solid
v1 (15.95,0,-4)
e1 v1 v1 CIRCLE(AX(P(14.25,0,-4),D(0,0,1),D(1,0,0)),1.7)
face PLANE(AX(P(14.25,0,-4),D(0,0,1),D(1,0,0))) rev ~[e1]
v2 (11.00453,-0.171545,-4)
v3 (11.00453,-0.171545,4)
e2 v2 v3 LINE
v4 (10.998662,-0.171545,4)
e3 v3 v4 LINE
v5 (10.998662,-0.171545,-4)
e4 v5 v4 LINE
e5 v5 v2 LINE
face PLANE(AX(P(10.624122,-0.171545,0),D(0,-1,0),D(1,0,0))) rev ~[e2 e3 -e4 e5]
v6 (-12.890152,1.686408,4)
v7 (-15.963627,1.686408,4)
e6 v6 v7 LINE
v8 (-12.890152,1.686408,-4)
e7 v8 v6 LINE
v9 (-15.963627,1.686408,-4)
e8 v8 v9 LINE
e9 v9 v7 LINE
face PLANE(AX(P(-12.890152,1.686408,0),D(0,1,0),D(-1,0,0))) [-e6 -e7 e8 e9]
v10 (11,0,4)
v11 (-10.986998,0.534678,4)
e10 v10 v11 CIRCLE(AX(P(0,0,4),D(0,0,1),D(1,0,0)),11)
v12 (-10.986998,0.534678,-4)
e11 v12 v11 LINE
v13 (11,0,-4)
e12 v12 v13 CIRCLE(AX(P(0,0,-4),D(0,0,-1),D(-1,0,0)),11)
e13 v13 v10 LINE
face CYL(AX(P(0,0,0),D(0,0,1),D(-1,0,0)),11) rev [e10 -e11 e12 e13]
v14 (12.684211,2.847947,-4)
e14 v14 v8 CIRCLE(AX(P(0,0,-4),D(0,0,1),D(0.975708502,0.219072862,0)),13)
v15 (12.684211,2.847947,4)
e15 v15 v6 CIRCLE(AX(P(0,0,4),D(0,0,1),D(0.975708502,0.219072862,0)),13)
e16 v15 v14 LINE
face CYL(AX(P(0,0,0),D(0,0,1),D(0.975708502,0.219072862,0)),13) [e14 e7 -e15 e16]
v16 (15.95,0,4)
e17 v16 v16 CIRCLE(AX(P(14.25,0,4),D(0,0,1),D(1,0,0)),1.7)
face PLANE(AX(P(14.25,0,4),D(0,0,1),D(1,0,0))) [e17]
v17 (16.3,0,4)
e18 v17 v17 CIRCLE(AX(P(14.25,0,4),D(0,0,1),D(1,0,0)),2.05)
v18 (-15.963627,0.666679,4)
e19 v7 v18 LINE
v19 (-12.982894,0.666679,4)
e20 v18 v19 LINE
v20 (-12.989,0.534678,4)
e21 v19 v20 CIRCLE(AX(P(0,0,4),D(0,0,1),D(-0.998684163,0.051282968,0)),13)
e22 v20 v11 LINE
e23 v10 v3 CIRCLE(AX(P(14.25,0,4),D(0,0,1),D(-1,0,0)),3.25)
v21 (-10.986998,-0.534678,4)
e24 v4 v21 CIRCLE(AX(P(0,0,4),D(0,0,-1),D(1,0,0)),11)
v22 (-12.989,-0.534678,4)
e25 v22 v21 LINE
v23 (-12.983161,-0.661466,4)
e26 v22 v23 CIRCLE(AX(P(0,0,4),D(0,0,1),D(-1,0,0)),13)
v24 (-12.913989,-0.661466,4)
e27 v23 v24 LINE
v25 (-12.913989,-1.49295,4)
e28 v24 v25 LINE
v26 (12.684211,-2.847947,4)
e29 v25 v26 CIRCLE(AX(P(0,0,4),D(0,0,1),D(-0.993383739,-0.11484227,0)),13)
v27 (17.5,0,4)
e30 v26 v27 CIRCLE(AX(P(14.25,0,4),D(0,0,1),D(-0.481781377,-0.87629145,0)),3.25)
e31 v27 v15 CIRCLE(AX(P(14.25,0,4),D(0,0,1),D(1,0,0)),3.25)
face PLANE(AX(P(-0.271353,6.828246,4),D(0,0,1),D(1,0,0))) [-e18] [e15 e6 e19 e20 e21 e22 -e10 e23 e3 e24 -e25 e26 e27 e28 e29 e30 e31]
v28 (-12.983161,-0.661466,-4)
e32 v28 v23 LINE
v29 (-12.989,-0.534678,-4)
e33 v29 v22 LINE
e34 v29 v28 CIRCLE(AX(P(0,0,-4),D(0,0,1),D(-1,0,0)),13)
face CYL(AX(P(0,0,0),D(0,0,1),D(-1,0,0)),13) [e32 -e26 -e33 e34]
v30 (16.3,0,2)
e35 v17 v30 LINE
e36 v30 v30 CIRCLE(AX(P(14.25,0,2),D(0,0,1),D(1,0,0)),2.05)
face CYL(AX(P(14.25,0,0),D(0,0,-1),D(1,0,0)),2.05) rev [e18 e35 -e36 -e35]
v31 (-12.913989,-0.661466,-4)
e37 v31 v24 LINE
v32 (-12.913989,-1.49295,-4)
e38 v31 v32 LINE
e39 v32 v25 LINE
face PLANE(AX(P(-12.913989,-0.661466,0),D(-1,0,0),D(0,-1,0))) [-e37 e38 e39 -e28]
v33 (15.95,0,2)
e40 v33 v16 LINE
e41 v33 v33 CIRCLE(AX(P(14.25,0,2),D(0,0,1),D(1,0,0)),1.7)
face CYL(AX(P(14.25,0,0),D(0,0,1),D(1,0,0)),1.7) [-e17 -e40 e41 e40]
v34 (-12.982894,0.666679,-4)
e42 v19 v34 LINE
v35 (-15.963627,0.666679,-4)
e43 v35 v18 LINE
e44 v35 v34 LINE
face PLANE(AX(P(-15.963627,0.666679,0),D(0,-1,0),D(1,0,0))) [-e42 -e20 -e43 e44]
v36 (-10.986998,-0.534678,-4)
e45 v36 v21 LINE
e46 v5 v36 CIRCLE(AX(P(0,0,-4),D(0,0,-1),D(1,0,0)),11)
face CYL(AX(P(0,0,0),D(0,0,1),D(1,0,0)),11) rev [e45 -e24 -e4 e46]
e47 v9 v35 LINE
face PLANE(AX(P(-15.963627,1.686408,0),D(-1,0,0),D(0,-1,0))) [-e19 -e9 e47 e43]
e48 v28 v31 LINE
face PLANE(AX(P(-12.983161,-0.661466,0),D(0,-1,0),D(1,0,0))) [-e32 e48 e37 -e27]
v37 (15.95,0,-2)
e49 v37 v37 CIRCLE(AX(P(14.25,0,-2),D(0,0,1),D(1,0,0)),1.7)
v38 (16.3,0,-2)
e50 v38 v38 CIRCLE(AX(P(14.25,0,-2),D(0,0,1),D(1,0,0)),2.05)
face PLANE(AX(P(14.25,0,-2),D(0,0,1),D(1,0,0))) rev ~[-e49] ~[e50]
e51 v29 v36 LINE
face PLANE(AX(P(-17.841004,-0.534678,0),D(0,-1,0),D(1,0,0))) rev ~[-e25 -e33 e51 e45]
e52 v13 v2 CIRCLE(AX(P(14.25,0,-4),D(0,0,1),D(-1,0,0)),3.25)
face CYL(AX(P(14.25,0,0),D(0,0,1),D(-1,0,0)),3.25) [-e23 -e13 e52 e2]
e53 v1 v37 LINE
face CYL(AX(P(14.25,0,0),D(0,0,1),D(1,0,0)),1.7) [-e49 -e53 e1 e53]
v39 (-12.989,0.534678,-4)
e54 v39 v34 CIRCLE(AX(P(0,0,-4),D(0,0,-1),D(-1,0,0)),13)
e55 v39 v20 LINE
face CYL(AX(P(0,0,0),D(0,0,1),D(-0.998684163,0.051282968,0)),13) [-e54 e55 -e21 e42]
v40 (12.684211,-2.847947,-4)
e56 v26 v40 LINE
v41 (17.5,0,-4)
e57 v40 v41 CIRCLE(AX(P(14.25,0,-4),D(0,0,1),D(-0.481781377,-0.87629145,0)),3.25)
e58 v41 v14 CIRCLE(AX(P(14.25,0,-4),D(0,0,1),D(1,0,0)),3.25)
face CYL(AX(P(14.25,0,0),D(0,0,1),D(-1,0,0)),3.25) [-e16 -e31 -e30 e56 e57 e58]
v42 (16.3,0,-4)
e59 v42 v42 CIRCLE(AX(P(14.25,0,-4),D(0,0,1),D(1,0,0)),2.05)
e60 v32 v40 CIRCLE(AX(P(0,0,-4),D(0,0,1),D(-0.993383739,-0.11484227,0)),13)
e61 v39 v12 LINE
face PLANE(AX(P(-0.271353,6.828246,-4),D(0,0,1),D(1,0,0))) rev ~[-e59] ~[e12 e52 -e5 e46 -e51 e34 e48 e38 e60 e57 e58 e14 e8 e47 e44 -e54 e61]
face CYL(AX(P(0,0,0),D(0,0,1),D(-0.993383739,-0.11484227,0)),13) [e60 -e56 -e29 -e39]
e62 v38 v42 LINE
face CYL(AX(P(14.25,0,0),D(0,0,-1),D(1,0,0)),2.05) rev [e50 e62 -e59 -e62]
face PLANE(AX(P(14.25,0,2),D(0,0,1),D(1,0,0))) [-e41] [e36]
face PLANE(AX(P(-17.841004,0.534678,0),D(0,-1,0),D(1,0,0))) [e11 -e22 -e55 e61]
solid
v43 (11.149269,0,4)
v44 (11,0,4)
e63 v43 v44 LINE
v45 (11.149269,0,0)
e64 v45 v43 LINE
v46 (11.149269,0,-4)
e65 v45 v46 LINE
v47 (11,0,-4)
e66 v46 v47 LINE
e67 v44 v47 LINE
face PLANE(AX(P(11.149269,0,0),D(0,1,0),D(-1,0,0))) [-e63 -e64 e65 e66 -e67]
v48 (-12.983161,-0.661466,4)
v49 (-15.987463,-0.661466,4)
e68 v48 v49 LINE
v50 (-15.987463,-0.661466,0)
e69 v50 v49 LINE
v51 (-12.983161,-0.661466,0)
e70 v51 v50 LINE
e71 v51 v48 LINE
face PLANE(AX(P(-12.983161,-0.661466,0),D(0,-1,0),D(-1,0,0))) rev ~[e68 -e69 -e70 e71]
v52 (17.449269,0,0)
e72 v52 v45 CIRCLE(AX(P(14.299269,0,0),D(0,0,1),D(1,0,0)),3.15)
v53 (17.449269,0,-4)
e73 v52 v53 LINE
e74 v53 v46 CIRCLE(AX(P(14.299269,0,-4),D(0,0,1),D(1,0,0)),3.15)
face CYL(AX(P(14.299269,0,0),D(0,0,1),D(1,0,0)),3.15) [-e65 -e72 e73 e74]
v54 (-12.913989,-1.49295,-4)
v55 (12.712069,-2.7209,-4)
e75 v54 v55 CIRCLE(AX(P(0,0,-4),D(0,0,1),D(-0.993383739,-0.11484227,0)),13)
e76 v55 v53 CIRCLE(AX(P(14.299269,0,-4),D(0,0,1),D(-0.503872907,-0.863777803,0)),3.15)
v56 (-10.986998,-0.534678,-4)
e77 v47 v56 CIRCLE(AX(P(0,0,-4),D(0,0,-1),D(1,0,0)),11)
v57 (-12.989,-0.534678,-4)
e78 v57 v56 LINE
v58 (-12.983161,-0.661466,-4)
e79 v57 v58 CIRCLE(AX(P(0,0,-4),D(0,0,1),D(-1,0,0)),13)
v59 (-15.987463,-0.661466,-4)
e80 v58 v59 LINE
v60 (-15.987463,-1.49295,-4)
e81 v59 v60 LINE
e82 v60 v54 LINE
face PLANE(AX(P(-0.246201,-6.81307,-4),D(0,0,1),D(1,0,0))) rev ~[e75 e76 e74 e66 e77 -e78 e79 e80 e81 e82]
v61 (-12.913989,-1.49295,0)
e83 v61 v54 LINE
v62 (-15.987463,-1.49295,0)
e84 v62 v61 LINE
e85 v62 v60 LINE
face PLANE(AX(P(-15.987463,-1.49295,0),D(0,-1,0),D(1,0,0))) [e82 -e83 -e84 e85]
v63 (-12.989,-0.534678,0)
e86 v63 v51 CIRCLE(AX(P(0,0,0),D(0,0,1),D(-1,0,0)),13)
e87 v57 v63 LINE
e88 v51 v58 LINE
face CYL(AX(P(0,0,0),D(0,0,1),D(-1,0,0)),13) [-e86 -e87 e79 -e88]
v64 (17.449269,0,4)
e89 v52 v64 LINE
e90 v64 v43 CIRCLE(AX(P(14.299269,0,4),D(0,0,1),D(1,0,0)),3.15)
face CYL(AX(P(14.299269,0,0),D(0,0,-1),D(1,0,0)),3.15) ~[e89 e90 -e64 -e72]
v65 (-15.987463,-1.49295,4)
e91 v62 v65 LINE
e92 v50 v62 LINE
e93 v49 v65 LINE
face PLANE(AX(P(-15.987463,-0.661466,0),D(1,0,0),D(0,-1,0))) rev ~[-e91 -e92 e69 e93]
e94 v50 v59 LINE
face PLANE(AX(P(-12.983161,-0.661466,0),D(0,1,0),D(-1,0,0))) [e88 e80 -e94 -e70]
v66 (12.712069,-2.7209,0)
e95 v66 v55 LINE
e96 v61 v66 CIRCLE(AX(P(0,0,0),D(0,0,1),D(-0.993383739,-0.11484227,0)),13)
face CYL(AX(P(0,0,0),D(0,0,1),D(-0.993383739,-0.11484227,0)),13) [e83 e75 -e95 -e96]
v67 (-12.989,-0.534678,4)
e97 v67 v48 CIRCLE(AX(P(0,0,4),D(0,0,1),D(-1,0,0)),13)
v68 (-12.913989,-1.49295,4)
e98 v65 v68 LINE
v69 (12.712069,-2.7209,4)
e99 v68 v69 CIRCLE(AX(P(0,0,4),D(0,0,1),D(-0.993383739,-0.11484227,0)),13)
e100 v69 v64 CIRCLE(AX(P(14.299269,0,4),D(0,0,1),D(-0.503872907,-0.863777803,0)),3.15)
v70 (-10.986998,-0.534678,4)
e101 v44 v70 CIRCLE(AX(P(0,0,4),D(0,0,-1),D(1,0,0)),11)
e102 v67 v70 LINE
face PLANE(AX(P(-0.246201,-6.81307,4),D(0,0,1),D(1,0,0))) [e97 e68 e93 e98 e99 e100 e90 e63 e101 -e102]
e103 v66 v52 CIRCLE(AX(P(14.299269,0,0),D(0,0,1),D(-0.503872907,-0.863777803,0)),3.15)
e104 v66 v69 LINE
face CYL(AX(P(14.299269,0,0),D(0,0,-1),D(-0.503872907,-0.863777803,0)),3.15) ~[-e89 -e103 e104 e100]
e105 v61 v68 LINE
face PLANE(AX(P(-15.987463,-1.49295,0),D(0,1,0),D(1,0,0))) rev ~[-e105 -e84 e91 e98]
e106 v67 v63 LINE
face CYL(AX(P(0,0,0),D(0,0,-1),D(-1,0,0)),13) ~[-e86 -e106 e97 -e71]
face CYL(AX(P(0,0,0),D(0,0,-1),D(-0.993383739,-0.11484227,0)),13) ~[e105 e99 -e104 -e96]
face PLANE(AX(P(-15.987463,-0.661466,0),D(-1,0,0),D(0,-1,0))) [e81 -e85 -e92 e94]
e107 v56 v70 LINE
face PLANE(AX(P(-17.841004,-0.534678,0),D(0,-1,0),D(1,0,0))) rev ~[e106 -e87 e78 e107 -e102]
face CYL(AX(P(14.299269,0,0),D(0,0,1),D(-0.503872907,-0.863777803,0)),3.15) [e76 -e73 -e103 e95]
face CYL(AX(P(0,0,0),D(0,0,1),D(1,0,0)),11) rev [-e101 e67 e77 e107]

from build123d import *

# Parameters (mm, degrees)
F0_R      = 2.05
F1_DEPTH  = 4
F2_DEPTH  = 2
F5_DEPTH  = 4
F6_W      = 7.8420564532
F6_H      = 1.0693569202
F7_DEPTH  = 4.5
F0_R_2    = 1.7
F8_DEPTH  = 2
F9_DEPTH  = 4
F10_W     = 1.5671141446
F10_H     = 0.3430901561
F11_DEPTH = 4
F12_DEPTH = 4
F13_DEPTH = 4
F14_DEPTH = 4


# Not quite as in the source:
# - the program builds the solid bodies; features that only make, move or delete a surface that nothing else refers to are left out


with BuildPart() as f1:
    # F0 (on Top) → F1 (new body, symmetric)
    with BuildSketch(Plane.XY):
        with BuildLine():
            ThreePointArc((-11, 0), (0, 11), (11, 0))
            ThreePointArc((11, 0), (11.4525622626, 1.6543403837), (12.6842105263, 2.8479472123))
            ThreePointArc((12.6842105263, 2.8479472123), (-0.5898274536, 12.986612475), (-12.8901523849, 1.6864078669))
            Line((-12.8901523849, 1.6864078669), (-12.8901523849, 0.6666785921))
            Line((-12.8901523849, 0.6666785921), (-12.9828941171, 0.6666785921))
            ThreePointArc((-12.9828941171, 0.6666785921), (-12.9957228256, 0.3334490052), (-13, 0))
            Line((-13, 0), (-11, 0))
        make_face()
        with BuildLine():
            ThreePointArc((12.6842105263, 2.8479472123), (11.4525622626, 1.6543403837), (11, 0))
            ThreePointArc((11, 0), (11.4525622626, -1.6543403837), (12.6842105263, -2.8479472123))
            ThreePointArc((12.6842105263, -2.8479472123), (15.9043403837, -2.7974377374), (17.5, 0))
            ThreePointArc((17.5, 0), (15.9043403837, 2.7974377374), (12.6842105263, 2.8479472123))
        make_face()
        with Locations((14.25, 0)):
            Circle(F0_R, mode=Mode.SUBTRACT)
        with BuildLine():
            Line((-12.8901523849, 0.6666785921), (-12.8901523849, 1.6864078669))
            ThreePointArc((-12.8901523849, 1.6864078669), (-12.9465669493, 1.1774566778), (-12.9828941171, 0.6666785921))
            Line((-12.9828941171, 0.6666785921), (-12.8901523849, 0.6666785921))
        make_face()
        with BuildLine():
            ThreePointArc((-12.9828941171, 0.6666785921), (-12.9465669493, 1.1774566778), (-12.8901523849, 1.6864078669))
            Line((-12.8901523849, 1.6864078669), (-15.9636270255, 1.6864078669))
            Line((-15.9636270255, 1.6864078669), (-15.9636270255, 0.6666785921))
            Line((-15.9636270255, 0.6666785921), (-12.9828941171, 0.6666785921))
        make_face()
    extrude(amount=F1_DEPTH, both=True)

    # F0 (on Top) → F2 (cut, symmetric)
    with BuildSketch(Plane.XY):
        with BuildLine():
            ThreePointArc((12.6842105263, 2.8479472123), (11.4525622626, 1.6543403837), (11, 0))
            ThreePointArc((11, 0), (11.4525622626, -1.6543403837), (12.6842105263, -2.8479472123))
            ThreePointArc((12.6842105263, -2.8479472123), (15.9043403837, -2.7974377374), (17.5, 0))
            ThreePointArc((17.5, 0), (15.9043403837, 2.7974377374), (12.6842105263, 2.8479472123))
        make_face()
        with Locations((14.25, 0)):
            Circle(F0_R, mode=Mode.SUBTRACT)
    extrude(amount=F2_DEPTH, both=True, mode=Mode.SUBTRACT)


with BuildPart() as f5:
    # F3 (on Top) → F5 (new body, symmetric)
    with BuildSketch(Plane.XY):
        with BuildLine():
            ThreePointArc((11, 0), (0, -11), (-11, 0))
            Line((-11, 0), (-13, 0))
            ThreePointArc((-13, 0), (-12.9957895083, -0.3308399253), (-12.9831607606, -0.6614655431))
            Line((-12.9831607606, -0.6614655431), (-12.9139886071, -0.6614655431))
            Line((-12.9139886071, -0.6614655431), (-12.9139886071, -1.4929495154))
            ThreePointArc((-12.9139886071, -1.4929495154), (-0.6222206293, -12.98510075), (12.7120691767, -2.7209000803))
            ThreePointArc((12.7120691767, -2.7209000803), (11.5677693449, -1.5688883132), (11.1492688343, 0))
            Line((11.1492688343, 0), (11, 0))
        make_face()
    extrude(amount=F5_DEPTH, both=True)


with BuildPart() as f7_tool:
    # F6 (on Top) → F7 (new body, symmetric)
    with BuildSketch(Plane.XY):
        with Locations((-13.9199756086, 0)):
            Rectangle(F6_W, F6_H)
    extrude(amount=F7_DEPTH, both=True)


with BuildPart() as f1_1:
    add(f1.part)

    # F7: cut by f7_tool
    add(f7_tool.part, mode=Mode.SUBTRACT)


with BuildPart() as f5_1:
    add(f5.part)

    # F7: cut by f7_tool
    add(f7_tool.part, mode=Mode.SUBTRACT)


with BuildPart() as f8:
    # F0 (on Top) → F8 (new body, symmetric)
    with BuildSketch(Plane.XY):
        with Locations((14.25, 0)):
            Circle(F0_R)
        with Locations((14.25, 0)):
            Circle(F0_R_2, mode=Mode.SUBTRACT)
    extrude(amount=F8_DEPTH, both=True)

    # F0 (on Top) → F9 (join, symmetric)
    with BuildSketch(Plane.XY):
        with Locations((14.25, 0)):
            Circle(F0_R_2)
    extrude(amount=F9_DEPTH, both=True)


with BuildPart() as f11_tool:
    # F10 (on Top) → F11 (new body, symmetric)
    with BuildSketch(Plane.XY):
        with Locations((11.4076789469, 0)):
            Rectangle(F10_W, F10_H)
    extrude(amount=F11_DEPTH, both=True)


with BuildPart() as f1_2:
    add(f1_1.part)

    # F11: cut by f11_tool
    add(f11_tool.part, mode=Mode.SUBTRACT)



with BuildPart() as f5_2:
    add(f5_1.part)

    # F11: cut by f11_tool
    add(f11_tool.part, mode=Mode.SUBTRACT)


with BuildPart() as f1_3:
    add(f1_2.part)

    add(f5_2.part)  # F12 merges F5

    add(f8.part)  # F12 merges F8
    # F0 (on Top) → F12 (join, symmetric)
    with BuildSketch(Plane.XY):
        with BuildLine():
            ThreePointArc((-11, 0), (0, 11), (11, 0))
            ThreePointArc((11, 0), (11.4525622626, 1.6543403837), (12.6842105263, 2.8479472123))
            ThreePointArc((12.6842105263, 2.8479472123), (-0.5898274536, 12.986612475), (-12.8901523849, 1.6864078669))
            Line((-12.8901523849, 1.6864078669), (-12.8901523849, 0.6666785921))
            Line((-12.8901523849, 0.6666785921), (-12.9828941171, 0.6666785921))
            ThreePointArc((-12.9828941171, 0.6666785921), (-12.9957228256, 0.3334490052), (-13, 0))
            Line((-13, 0), (-11, 0))
        make_face()
        with BuildLine():
            ThreePointArc((12.6842105263, 2.8479472123), (11.4525622626, 1.6543403837), (11, 0))
            ThreePointArc((11, 0), (11.4525622626, -1.6543403837), (12.6842105263, -2.8479472123))
            ThreePointArc((12.6842105263, -2.8479472123), (15.9043403837, -2.7974377374), (17.5, 0))
            ThreePointArc((17.5, 0), (15.9043403837, 2.7974377374), (12.6842105263, 2.8479472123))
        make_face()
        with Locations((14.25, 0)):
            Circle(F0_R, mode=Mode.SUBTRACT)
        with BuildLine():
            Line((-12.8901523849, 0.6666785921), (-12.8901523849, 1.6864078669))
            ThreePointArc((-12.8901523849, 1.6864078669), (-12.9465669493, 1.1774566778), (-12.9828941171, 0.6666785921))
            Line((-12.9828941171, 0.6666785921), (-12.8901523849, 0.6666785921))
        make_face()
        with BuildLine():
            ThreePointArc((-12.9828941171, 0.6666785921), (-12.9465669493, 1.1774566778), (-12.8901523849, 1.6864078669))
            Line((-12.8901523849, 1.6864078669), (-15.9636270255, 1.6864078669))
            Line((-15.9636270255, 1.6864078669), (-15.9636270255, 0.6666785921))
            Line((-15.9636270255, 0.6666785921), (-12.9828941171, 0.6666785921))
        make_face()
    extrude(amount=F12_DEPTH, both=True)


with BuildPart() as f13:
    # F3 (on Top) → F13 (new body, symmetric)
    with BuildSketch(Plane.XY):
        with BuildLine():
            ThreePointArc((11, 0), (0, -11), (-11, 0))
            Line((-11, 0), (-13, 0))
            ThreePointArc((-13, 0), (-12.9957895083, -0.3308399253), (-12.9831607606, -0.6614655431))
            Line((-12.9831607606, -0.6614655431), (-12.9139886071, -0.6614655431))
            Line((-12.9139886071, -0.6614655431), (-12.9139886071, -1.4929495154))
            ThreePointArc((-12.9139886071, -1.4929495154), (-0.6222206293, -12.98510075), (12.7120691767, -2.7209000803))
            ThreePointArc((12.7120691767, -2.7209000803), (11.5677693449, -1.5688883132), (11.1492688343, 0))
            Line((11.1492688343, 0), (11, 0))
        make_face()
        with BuildLine():
            ThreePointArc((17.4492688343, 0), (14.2992688343, 3.15), (11.1492688343, 0))
            Line((11.1492688343, 0), (13, 0))
            ThreePointArc((13, 0), (12.9278168941, -1.3680461803), (12.7120691767, -2.7209000803))
            ThreePointArc((12.7120691767, -2.7209000803), (15.8681571475, -2.7314994894), (17.4492688343, 0))
        make_face()
        with BuildLine():
            Line((13, 0), (11.1492688343, 0))
            ThreePointArc((11.1492688343, 0), (11.5677693449, -1.5688883132), (12.7120691767, -2.7209000803))
            ThreePointArc((12.7120691767, -2.7209000803), (12.9278168941, -1.3680461803), (13, 0))
        make_face()
        with BuildLine():
            Line((-12.9139886071, -0.6614655431), (-12.9831607606, -0.6614655431))
            ThreePointArc((-12.9831607606, -0.6614655431), (-12.9552471124, -1.0777626166), (-12.9139886071, -1.4929495154))
            Line((-12.9139886071, -1.4929495154), (-12.9139886071, -0.6614655431))
        make_face()
        with BuildLine():
            ThreePointArc((-12.9139886071, -1.4929495154), (-12.9552471124, -1.0777626166), (-12.9831607606, -0.6614655431))
            Line((-12.9831607606, -0.6614655431), (-15.9874632477, -0.6614655431))
            Line((-15.9874632477, -0.6614655431), (-15.9874632477, -1.4929495154))
            Line((-15.9874632477, -1.4929495154), (-12.9139886071, -1.4929495154))
        make_face()
    extrude(amount=F13_DEPTH, both=True)


with BuildPart() as f14_tool:
    # F6 (on Top) → F14 (new body, symmetric)
    with BuildSketch(Plane.XY):
        with Locations((-13.9199756086, 0)):
            Rectangle(F6_W, F6_H)
    extrude(amount=F14_DEPTH, both=True)


with BuildPart() as f1_4:
    add(f1_3.part)

    # F14: cut by f14_tool
    add(f14_tool.part, mode=Mode.SUBTRACT)


with BuildPart() as f13_1:
    add(f13.part)

    # F14: cut by f14_tool
    add(f14_tool.part, mode=Mode.SUBTRACT)


solid = Compound([f1_4.part, f13_1.part])
